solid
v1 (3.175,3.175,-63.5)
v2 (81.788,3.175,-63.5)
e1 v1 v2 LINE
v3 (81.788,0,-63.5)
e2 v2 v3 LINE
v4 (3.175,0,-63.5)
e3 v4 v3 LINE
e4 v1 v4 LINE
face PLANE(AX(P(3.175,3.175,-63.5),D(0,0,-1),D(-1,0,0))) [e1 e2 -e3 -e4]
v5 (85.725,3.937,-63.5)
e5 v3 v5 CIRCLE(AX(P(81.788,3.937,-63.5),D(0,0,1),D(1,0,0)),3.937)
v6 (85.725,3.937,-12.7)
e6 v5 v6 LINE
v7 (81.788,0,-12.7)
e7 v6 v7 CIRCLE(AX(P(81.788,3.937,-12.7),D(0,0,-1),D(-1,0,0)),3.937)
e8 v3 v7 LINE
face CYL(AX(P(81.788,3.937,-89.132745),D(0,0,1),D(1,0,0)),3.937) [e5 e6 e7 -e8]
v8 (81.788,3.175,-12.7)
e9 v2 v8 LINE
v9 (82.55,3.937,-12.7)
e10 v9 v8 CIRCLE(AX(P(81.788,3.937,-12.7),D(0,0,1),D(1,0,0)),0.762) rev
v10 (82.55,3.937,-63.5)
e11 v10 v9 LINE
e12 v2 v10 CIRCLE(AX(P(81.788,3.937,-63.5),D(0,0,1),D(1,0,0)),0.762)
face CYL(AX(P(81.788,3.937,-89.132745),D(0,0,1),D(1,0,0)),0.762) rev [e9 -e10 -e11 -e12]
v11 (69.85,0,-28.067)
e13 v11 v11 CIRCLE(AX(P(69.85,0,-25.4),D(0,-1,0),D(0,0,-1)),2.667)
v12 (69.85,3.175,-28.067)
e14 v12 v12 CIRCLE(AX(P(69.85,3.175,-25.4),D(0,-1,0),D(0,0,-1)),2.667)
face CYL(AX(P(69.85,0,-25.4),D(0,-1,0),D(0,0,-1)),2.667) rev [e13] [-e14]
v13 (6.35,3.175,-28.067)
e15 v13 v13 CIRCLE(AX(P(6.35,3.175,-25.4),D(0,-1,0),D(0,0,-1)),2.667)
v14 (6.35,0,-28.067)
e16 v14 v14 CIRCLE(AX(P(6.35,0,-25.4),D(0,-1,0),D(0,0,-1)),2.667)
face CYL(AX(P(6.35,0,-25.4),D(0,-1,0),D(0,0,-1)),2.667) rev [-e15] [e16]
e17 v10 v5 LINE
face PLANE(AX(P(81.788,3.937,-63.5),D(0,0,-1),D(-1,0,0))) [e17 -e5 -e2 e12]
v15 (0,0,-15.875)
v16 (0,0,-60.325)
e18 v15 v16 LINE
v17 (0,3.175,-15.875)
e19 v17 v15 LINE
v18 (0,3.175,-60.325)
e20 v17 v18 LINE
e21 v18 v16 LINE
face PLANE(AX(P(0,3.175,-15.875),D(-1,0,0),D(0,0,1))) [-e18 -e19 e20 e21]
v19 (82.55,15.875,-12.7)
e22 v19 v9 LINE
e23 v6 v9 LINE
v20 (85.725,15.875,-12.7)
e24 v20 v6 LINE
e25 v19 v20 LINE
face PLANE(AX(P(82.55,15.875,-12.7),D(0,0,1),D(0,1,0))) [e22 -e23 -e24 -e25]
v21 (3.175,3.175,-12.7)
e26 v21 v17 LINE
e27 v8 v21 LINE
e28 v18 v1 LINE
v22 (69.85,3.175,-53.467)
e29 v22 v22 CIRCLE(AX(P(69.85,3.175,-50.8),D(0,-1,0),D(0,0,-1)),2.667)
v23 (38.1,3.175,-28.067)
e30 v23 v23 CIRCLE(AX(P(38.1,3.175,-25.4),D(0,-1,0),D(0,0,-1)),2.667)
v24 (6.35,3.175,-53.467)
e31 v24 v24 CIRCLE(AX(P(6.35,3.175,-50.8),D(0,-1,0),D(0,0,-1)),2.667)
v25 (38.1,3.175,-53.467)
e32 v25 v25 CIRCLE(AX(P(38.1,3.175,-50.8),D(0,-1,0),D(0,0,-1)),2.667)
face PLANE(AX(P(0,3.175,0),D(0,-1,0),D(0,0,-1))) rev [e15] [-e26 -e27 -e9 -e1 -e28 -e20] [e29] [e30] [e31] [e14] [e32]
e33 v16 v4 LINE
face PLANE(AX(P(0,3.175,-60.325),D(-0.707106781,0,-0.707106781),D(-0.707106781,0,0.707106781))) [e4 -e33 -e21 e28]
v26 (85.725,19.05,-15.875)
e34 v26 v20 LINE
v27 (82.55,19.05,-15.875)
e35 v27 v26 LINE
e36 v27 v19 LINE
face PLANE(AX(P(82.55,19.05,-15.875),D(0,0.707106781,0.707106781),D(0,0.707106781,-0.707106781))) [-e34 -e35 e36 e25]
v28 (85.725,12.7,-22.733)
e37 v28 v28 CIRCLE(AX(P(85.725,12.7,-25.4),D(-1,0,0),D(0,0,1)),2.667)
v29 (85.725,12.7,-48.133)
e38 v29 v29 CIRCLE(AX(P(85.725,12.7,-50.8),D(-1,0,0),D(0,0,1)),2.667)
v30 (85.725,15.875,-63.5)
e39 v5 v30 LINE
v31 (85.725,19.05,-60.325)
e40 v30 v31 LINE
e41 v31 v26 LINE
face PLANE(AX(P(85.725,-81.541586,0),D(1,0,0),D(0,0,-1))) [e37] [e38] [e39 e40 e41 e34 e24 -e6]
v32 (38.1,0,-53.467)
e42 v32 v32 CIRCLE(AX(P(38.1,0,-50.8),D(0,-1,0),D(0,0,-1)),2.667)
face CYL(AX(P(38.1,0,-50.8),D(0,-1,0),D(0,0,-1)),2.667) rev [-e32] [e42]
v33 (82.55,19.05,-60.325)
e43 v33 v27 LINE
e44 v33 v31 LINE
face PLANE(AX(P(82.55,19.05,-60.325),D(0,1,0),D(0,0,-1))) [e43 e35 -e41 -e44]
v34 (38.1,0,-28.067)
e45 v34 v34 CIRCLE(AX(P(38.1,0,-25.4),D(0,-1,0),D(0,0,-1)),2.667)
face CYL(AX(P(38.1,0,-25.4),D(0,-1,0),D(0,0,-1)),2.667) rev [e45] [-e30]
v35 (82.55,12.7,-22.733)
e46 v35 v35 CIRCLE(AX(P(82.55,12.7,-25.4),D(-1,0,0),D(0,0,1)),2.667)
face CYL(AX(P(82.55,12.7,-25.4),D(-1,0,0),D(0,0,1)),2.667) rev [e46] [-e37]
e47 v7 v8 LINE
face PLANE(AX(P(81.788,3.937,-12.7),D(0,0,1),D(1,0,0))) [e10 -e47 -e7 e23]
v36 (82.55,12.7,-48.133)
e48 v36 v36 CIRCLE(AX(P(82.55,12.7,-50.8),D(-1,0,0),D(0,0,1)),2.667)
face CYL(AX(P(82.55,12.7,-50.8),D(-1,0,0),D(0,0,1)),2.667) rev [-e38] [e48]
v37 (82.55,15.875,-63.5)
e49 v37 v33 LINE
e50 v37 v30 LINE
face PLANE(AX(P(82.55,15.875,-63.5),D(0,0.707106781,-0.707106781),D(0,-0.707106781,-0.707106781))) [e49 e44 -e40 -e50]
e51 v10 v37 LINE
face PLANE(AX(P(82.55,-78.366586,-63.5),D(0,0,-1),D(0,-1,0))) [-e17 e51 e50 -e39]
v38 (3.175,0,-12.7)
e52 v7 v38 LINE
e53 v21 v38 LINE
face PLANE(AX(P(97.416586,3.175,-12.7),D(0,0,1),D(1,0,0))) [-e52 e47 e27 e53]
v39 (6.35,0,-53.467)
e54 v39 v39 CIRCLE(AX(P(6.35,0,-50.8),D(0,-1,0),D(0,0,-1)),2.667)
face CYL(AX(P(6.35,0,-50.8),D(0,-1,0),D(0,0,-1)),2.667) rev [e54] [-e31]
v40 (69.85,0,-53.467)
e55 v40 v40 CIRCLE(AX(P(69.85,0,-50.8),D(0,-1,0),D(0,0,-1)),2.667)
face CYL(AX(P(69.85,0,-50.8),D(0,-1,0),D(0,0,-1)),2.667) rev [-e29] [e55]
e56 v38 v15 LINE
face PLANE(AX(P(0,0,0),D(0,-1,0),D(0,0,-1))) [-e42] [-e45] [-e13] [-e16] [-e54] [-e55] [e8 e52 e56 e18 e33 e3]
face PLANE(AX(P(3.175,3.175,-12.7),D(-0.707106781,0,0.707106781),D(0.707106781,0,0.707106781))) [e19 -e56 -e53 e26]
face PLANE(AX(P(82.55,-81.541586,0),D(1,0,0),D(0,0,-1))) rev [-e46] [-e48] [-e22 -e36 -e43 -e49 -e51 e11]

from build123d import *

# Parameters (mm, degrees)
BOSS_EXTRUDE1_DEPTH        = 3.175
F_10_CLEARANCE_HOLE1_D     = 5.334
F_10_CLEARANCE_HOLE2_D     = 5.334
SKETCHED_START             = 85.725
SKETCHED_BEND1_OUTLINE_W   = 3.175
SKETCHED_BEND1_OUTLINE_H   = 50.8
SKETCHED_BEND1_DEPTH       = 14.86658597
SKETCHED_START_2           = 82.55
SKETCHED_BEND1_2_OUTLINE_R = 2.667
SKETCHED_BEND1_2_DEPTH     = 2.79208738
SKETCHED_START_3           = 81.788
SKETCHED_BEND1_3_OUTLINE_R = 2.667
SKETCHED_BEND1_3_DEPTH     = 3.937
SKETCHED_START_4           = -63.5
SKETCHED_BEND1_4_DEPTH     = 51.5


with BuildPart() as part:
    # Sketch11 → Boss-Extrude1 (new body)
    with BuildSketch(Plane.XZ):
        Polygon((97.41658597, -12.7), (3.175, -12.7), (0, -15.875), (0, -60.325), (3.175, -63.5), (97.41658597, -63.5), (100.59158597, -60.325), (100.59158597, -15.875), align=None)
    extrude(amount=-BOSS_EXTRUDE1_DEPTH)

    # #10 Clearance Hole1 (through all)
    with Locations(Plane(origin=(0, 3.175, 0), x_dir=(1, 0, 0), z_dir=(0, 1, 0))):
        with Locations((94.24158597, 25.4), (94.24158597, 50.8)):
            Hole(F_10_CLEARANCE_HOLE1_D / 2)

    # #10 Clearance Hole2 (through all)
    with Locations(Plane(origin=(0, 0, 0), x_dir=(-1, 0, 0), z_dir=(0, -1, 0))):
        with Locations((-38.1, 25.4), (-38.1, 50.8), (-69.85, 25.4), (-69.85, 50.8), (-6.35, 25.4), (-6.35, 50.8)):
            Hole(F_10_CLEARANCE_HOLE2_D / 2)

    # Sketched Bend1: read off the stored shape, not the designer's step
    # Sketched Bend1 outline → Sketched Bend1 (cut)
    with BuildSketch(Plane.YZ.offset(SKETCHED_START)):
        with Locations((1.5875, -38.1)):
            Rectangle(SKETCHED_BEND1_OUTLINE_W, SKETCHED_BEND1_OUTLINE_H)
    extrude(amount=SKETCHED_BEND1_DEPTH, mode=Mode.SUBTRACT)

    # Sketched Bend1 2 outline → Sketched Bend1 2 (add)
    with BuildSketch(Plane.YZ.offset(SKETCHED_START_2)):
        Polygon((19.05, -60.325), (19.05, -15.875), (15.875, -12.7), (3.175, -12.7), (3.175, -63.5), (15.875, -63.5), align=None)
        with Locations((12.7, -50.8)):
            Circle(SKETCHED_BEND1_2_OUTLINE_R, mode=Mode.SUBTRACT)
        with Locations((12.7, -25.4)):
            Circle(SKETCHED_BEND1_2_OUTLINE_R, mode=Mode.SUBTRACT)
    extrude(amount=SKETCHED_BEND1_2_DEPTH)

    # Sketched Bend1 3 outline → Sketched Bend1 3 (add)
    with BuildSketch(Plane.YZ.offset(SKETCHED_START_3)):
        Polygon((19.05, -60.325), (19.05, -15.875), (15.875, -12.7), (3.175, -12.7), (3.175, -63.5), (15.875, -63.5), align=None)
        with Locations((12.7, -50.8)):
            Circle(SKETCHED_BEND1_3_OUTLINE_R, mode=Mode.SUBTRACT)
        with Locations((12.7, -25.4)):
            Circle(SKETCHED_BEND1_3_OUTLINE_R, mode=Mode.SUBTRACT)
    extrude(amount=SKETCHED_BEND1_3_DEPTH)

    # Sketched Bend1 4 outline → Sketched Bend1 4 (cut)
    with BuildSketch(Plane.XY.offset(SKETCHED_START_4)):
        with BuildLine():
            ThreePointArc((81.788, 3.175), (82.326815367, 3.398184633), (82.55, 3.937))
            Line((82.55, 3.937), (82.55, 19.05))
            Line((82.55, 19.05), (81.788, 19.05))
            Line((81.788, 19.05), (81.788, 3.175))
        make_face()
        with BuildLine():
            Line((85.725, 0), (85.725, 3.937))
            ThreePointArc((85.725, 3.937), (84.571879398, 1.153120602), (81.788, 0))
            Line((81.788, 0), (85.725, 0))
        make_face()
    extrude(amount=SKETCHED_BEND1_4_DEPTH, mode=Mode.SUBTRACT)


solid = part.part
